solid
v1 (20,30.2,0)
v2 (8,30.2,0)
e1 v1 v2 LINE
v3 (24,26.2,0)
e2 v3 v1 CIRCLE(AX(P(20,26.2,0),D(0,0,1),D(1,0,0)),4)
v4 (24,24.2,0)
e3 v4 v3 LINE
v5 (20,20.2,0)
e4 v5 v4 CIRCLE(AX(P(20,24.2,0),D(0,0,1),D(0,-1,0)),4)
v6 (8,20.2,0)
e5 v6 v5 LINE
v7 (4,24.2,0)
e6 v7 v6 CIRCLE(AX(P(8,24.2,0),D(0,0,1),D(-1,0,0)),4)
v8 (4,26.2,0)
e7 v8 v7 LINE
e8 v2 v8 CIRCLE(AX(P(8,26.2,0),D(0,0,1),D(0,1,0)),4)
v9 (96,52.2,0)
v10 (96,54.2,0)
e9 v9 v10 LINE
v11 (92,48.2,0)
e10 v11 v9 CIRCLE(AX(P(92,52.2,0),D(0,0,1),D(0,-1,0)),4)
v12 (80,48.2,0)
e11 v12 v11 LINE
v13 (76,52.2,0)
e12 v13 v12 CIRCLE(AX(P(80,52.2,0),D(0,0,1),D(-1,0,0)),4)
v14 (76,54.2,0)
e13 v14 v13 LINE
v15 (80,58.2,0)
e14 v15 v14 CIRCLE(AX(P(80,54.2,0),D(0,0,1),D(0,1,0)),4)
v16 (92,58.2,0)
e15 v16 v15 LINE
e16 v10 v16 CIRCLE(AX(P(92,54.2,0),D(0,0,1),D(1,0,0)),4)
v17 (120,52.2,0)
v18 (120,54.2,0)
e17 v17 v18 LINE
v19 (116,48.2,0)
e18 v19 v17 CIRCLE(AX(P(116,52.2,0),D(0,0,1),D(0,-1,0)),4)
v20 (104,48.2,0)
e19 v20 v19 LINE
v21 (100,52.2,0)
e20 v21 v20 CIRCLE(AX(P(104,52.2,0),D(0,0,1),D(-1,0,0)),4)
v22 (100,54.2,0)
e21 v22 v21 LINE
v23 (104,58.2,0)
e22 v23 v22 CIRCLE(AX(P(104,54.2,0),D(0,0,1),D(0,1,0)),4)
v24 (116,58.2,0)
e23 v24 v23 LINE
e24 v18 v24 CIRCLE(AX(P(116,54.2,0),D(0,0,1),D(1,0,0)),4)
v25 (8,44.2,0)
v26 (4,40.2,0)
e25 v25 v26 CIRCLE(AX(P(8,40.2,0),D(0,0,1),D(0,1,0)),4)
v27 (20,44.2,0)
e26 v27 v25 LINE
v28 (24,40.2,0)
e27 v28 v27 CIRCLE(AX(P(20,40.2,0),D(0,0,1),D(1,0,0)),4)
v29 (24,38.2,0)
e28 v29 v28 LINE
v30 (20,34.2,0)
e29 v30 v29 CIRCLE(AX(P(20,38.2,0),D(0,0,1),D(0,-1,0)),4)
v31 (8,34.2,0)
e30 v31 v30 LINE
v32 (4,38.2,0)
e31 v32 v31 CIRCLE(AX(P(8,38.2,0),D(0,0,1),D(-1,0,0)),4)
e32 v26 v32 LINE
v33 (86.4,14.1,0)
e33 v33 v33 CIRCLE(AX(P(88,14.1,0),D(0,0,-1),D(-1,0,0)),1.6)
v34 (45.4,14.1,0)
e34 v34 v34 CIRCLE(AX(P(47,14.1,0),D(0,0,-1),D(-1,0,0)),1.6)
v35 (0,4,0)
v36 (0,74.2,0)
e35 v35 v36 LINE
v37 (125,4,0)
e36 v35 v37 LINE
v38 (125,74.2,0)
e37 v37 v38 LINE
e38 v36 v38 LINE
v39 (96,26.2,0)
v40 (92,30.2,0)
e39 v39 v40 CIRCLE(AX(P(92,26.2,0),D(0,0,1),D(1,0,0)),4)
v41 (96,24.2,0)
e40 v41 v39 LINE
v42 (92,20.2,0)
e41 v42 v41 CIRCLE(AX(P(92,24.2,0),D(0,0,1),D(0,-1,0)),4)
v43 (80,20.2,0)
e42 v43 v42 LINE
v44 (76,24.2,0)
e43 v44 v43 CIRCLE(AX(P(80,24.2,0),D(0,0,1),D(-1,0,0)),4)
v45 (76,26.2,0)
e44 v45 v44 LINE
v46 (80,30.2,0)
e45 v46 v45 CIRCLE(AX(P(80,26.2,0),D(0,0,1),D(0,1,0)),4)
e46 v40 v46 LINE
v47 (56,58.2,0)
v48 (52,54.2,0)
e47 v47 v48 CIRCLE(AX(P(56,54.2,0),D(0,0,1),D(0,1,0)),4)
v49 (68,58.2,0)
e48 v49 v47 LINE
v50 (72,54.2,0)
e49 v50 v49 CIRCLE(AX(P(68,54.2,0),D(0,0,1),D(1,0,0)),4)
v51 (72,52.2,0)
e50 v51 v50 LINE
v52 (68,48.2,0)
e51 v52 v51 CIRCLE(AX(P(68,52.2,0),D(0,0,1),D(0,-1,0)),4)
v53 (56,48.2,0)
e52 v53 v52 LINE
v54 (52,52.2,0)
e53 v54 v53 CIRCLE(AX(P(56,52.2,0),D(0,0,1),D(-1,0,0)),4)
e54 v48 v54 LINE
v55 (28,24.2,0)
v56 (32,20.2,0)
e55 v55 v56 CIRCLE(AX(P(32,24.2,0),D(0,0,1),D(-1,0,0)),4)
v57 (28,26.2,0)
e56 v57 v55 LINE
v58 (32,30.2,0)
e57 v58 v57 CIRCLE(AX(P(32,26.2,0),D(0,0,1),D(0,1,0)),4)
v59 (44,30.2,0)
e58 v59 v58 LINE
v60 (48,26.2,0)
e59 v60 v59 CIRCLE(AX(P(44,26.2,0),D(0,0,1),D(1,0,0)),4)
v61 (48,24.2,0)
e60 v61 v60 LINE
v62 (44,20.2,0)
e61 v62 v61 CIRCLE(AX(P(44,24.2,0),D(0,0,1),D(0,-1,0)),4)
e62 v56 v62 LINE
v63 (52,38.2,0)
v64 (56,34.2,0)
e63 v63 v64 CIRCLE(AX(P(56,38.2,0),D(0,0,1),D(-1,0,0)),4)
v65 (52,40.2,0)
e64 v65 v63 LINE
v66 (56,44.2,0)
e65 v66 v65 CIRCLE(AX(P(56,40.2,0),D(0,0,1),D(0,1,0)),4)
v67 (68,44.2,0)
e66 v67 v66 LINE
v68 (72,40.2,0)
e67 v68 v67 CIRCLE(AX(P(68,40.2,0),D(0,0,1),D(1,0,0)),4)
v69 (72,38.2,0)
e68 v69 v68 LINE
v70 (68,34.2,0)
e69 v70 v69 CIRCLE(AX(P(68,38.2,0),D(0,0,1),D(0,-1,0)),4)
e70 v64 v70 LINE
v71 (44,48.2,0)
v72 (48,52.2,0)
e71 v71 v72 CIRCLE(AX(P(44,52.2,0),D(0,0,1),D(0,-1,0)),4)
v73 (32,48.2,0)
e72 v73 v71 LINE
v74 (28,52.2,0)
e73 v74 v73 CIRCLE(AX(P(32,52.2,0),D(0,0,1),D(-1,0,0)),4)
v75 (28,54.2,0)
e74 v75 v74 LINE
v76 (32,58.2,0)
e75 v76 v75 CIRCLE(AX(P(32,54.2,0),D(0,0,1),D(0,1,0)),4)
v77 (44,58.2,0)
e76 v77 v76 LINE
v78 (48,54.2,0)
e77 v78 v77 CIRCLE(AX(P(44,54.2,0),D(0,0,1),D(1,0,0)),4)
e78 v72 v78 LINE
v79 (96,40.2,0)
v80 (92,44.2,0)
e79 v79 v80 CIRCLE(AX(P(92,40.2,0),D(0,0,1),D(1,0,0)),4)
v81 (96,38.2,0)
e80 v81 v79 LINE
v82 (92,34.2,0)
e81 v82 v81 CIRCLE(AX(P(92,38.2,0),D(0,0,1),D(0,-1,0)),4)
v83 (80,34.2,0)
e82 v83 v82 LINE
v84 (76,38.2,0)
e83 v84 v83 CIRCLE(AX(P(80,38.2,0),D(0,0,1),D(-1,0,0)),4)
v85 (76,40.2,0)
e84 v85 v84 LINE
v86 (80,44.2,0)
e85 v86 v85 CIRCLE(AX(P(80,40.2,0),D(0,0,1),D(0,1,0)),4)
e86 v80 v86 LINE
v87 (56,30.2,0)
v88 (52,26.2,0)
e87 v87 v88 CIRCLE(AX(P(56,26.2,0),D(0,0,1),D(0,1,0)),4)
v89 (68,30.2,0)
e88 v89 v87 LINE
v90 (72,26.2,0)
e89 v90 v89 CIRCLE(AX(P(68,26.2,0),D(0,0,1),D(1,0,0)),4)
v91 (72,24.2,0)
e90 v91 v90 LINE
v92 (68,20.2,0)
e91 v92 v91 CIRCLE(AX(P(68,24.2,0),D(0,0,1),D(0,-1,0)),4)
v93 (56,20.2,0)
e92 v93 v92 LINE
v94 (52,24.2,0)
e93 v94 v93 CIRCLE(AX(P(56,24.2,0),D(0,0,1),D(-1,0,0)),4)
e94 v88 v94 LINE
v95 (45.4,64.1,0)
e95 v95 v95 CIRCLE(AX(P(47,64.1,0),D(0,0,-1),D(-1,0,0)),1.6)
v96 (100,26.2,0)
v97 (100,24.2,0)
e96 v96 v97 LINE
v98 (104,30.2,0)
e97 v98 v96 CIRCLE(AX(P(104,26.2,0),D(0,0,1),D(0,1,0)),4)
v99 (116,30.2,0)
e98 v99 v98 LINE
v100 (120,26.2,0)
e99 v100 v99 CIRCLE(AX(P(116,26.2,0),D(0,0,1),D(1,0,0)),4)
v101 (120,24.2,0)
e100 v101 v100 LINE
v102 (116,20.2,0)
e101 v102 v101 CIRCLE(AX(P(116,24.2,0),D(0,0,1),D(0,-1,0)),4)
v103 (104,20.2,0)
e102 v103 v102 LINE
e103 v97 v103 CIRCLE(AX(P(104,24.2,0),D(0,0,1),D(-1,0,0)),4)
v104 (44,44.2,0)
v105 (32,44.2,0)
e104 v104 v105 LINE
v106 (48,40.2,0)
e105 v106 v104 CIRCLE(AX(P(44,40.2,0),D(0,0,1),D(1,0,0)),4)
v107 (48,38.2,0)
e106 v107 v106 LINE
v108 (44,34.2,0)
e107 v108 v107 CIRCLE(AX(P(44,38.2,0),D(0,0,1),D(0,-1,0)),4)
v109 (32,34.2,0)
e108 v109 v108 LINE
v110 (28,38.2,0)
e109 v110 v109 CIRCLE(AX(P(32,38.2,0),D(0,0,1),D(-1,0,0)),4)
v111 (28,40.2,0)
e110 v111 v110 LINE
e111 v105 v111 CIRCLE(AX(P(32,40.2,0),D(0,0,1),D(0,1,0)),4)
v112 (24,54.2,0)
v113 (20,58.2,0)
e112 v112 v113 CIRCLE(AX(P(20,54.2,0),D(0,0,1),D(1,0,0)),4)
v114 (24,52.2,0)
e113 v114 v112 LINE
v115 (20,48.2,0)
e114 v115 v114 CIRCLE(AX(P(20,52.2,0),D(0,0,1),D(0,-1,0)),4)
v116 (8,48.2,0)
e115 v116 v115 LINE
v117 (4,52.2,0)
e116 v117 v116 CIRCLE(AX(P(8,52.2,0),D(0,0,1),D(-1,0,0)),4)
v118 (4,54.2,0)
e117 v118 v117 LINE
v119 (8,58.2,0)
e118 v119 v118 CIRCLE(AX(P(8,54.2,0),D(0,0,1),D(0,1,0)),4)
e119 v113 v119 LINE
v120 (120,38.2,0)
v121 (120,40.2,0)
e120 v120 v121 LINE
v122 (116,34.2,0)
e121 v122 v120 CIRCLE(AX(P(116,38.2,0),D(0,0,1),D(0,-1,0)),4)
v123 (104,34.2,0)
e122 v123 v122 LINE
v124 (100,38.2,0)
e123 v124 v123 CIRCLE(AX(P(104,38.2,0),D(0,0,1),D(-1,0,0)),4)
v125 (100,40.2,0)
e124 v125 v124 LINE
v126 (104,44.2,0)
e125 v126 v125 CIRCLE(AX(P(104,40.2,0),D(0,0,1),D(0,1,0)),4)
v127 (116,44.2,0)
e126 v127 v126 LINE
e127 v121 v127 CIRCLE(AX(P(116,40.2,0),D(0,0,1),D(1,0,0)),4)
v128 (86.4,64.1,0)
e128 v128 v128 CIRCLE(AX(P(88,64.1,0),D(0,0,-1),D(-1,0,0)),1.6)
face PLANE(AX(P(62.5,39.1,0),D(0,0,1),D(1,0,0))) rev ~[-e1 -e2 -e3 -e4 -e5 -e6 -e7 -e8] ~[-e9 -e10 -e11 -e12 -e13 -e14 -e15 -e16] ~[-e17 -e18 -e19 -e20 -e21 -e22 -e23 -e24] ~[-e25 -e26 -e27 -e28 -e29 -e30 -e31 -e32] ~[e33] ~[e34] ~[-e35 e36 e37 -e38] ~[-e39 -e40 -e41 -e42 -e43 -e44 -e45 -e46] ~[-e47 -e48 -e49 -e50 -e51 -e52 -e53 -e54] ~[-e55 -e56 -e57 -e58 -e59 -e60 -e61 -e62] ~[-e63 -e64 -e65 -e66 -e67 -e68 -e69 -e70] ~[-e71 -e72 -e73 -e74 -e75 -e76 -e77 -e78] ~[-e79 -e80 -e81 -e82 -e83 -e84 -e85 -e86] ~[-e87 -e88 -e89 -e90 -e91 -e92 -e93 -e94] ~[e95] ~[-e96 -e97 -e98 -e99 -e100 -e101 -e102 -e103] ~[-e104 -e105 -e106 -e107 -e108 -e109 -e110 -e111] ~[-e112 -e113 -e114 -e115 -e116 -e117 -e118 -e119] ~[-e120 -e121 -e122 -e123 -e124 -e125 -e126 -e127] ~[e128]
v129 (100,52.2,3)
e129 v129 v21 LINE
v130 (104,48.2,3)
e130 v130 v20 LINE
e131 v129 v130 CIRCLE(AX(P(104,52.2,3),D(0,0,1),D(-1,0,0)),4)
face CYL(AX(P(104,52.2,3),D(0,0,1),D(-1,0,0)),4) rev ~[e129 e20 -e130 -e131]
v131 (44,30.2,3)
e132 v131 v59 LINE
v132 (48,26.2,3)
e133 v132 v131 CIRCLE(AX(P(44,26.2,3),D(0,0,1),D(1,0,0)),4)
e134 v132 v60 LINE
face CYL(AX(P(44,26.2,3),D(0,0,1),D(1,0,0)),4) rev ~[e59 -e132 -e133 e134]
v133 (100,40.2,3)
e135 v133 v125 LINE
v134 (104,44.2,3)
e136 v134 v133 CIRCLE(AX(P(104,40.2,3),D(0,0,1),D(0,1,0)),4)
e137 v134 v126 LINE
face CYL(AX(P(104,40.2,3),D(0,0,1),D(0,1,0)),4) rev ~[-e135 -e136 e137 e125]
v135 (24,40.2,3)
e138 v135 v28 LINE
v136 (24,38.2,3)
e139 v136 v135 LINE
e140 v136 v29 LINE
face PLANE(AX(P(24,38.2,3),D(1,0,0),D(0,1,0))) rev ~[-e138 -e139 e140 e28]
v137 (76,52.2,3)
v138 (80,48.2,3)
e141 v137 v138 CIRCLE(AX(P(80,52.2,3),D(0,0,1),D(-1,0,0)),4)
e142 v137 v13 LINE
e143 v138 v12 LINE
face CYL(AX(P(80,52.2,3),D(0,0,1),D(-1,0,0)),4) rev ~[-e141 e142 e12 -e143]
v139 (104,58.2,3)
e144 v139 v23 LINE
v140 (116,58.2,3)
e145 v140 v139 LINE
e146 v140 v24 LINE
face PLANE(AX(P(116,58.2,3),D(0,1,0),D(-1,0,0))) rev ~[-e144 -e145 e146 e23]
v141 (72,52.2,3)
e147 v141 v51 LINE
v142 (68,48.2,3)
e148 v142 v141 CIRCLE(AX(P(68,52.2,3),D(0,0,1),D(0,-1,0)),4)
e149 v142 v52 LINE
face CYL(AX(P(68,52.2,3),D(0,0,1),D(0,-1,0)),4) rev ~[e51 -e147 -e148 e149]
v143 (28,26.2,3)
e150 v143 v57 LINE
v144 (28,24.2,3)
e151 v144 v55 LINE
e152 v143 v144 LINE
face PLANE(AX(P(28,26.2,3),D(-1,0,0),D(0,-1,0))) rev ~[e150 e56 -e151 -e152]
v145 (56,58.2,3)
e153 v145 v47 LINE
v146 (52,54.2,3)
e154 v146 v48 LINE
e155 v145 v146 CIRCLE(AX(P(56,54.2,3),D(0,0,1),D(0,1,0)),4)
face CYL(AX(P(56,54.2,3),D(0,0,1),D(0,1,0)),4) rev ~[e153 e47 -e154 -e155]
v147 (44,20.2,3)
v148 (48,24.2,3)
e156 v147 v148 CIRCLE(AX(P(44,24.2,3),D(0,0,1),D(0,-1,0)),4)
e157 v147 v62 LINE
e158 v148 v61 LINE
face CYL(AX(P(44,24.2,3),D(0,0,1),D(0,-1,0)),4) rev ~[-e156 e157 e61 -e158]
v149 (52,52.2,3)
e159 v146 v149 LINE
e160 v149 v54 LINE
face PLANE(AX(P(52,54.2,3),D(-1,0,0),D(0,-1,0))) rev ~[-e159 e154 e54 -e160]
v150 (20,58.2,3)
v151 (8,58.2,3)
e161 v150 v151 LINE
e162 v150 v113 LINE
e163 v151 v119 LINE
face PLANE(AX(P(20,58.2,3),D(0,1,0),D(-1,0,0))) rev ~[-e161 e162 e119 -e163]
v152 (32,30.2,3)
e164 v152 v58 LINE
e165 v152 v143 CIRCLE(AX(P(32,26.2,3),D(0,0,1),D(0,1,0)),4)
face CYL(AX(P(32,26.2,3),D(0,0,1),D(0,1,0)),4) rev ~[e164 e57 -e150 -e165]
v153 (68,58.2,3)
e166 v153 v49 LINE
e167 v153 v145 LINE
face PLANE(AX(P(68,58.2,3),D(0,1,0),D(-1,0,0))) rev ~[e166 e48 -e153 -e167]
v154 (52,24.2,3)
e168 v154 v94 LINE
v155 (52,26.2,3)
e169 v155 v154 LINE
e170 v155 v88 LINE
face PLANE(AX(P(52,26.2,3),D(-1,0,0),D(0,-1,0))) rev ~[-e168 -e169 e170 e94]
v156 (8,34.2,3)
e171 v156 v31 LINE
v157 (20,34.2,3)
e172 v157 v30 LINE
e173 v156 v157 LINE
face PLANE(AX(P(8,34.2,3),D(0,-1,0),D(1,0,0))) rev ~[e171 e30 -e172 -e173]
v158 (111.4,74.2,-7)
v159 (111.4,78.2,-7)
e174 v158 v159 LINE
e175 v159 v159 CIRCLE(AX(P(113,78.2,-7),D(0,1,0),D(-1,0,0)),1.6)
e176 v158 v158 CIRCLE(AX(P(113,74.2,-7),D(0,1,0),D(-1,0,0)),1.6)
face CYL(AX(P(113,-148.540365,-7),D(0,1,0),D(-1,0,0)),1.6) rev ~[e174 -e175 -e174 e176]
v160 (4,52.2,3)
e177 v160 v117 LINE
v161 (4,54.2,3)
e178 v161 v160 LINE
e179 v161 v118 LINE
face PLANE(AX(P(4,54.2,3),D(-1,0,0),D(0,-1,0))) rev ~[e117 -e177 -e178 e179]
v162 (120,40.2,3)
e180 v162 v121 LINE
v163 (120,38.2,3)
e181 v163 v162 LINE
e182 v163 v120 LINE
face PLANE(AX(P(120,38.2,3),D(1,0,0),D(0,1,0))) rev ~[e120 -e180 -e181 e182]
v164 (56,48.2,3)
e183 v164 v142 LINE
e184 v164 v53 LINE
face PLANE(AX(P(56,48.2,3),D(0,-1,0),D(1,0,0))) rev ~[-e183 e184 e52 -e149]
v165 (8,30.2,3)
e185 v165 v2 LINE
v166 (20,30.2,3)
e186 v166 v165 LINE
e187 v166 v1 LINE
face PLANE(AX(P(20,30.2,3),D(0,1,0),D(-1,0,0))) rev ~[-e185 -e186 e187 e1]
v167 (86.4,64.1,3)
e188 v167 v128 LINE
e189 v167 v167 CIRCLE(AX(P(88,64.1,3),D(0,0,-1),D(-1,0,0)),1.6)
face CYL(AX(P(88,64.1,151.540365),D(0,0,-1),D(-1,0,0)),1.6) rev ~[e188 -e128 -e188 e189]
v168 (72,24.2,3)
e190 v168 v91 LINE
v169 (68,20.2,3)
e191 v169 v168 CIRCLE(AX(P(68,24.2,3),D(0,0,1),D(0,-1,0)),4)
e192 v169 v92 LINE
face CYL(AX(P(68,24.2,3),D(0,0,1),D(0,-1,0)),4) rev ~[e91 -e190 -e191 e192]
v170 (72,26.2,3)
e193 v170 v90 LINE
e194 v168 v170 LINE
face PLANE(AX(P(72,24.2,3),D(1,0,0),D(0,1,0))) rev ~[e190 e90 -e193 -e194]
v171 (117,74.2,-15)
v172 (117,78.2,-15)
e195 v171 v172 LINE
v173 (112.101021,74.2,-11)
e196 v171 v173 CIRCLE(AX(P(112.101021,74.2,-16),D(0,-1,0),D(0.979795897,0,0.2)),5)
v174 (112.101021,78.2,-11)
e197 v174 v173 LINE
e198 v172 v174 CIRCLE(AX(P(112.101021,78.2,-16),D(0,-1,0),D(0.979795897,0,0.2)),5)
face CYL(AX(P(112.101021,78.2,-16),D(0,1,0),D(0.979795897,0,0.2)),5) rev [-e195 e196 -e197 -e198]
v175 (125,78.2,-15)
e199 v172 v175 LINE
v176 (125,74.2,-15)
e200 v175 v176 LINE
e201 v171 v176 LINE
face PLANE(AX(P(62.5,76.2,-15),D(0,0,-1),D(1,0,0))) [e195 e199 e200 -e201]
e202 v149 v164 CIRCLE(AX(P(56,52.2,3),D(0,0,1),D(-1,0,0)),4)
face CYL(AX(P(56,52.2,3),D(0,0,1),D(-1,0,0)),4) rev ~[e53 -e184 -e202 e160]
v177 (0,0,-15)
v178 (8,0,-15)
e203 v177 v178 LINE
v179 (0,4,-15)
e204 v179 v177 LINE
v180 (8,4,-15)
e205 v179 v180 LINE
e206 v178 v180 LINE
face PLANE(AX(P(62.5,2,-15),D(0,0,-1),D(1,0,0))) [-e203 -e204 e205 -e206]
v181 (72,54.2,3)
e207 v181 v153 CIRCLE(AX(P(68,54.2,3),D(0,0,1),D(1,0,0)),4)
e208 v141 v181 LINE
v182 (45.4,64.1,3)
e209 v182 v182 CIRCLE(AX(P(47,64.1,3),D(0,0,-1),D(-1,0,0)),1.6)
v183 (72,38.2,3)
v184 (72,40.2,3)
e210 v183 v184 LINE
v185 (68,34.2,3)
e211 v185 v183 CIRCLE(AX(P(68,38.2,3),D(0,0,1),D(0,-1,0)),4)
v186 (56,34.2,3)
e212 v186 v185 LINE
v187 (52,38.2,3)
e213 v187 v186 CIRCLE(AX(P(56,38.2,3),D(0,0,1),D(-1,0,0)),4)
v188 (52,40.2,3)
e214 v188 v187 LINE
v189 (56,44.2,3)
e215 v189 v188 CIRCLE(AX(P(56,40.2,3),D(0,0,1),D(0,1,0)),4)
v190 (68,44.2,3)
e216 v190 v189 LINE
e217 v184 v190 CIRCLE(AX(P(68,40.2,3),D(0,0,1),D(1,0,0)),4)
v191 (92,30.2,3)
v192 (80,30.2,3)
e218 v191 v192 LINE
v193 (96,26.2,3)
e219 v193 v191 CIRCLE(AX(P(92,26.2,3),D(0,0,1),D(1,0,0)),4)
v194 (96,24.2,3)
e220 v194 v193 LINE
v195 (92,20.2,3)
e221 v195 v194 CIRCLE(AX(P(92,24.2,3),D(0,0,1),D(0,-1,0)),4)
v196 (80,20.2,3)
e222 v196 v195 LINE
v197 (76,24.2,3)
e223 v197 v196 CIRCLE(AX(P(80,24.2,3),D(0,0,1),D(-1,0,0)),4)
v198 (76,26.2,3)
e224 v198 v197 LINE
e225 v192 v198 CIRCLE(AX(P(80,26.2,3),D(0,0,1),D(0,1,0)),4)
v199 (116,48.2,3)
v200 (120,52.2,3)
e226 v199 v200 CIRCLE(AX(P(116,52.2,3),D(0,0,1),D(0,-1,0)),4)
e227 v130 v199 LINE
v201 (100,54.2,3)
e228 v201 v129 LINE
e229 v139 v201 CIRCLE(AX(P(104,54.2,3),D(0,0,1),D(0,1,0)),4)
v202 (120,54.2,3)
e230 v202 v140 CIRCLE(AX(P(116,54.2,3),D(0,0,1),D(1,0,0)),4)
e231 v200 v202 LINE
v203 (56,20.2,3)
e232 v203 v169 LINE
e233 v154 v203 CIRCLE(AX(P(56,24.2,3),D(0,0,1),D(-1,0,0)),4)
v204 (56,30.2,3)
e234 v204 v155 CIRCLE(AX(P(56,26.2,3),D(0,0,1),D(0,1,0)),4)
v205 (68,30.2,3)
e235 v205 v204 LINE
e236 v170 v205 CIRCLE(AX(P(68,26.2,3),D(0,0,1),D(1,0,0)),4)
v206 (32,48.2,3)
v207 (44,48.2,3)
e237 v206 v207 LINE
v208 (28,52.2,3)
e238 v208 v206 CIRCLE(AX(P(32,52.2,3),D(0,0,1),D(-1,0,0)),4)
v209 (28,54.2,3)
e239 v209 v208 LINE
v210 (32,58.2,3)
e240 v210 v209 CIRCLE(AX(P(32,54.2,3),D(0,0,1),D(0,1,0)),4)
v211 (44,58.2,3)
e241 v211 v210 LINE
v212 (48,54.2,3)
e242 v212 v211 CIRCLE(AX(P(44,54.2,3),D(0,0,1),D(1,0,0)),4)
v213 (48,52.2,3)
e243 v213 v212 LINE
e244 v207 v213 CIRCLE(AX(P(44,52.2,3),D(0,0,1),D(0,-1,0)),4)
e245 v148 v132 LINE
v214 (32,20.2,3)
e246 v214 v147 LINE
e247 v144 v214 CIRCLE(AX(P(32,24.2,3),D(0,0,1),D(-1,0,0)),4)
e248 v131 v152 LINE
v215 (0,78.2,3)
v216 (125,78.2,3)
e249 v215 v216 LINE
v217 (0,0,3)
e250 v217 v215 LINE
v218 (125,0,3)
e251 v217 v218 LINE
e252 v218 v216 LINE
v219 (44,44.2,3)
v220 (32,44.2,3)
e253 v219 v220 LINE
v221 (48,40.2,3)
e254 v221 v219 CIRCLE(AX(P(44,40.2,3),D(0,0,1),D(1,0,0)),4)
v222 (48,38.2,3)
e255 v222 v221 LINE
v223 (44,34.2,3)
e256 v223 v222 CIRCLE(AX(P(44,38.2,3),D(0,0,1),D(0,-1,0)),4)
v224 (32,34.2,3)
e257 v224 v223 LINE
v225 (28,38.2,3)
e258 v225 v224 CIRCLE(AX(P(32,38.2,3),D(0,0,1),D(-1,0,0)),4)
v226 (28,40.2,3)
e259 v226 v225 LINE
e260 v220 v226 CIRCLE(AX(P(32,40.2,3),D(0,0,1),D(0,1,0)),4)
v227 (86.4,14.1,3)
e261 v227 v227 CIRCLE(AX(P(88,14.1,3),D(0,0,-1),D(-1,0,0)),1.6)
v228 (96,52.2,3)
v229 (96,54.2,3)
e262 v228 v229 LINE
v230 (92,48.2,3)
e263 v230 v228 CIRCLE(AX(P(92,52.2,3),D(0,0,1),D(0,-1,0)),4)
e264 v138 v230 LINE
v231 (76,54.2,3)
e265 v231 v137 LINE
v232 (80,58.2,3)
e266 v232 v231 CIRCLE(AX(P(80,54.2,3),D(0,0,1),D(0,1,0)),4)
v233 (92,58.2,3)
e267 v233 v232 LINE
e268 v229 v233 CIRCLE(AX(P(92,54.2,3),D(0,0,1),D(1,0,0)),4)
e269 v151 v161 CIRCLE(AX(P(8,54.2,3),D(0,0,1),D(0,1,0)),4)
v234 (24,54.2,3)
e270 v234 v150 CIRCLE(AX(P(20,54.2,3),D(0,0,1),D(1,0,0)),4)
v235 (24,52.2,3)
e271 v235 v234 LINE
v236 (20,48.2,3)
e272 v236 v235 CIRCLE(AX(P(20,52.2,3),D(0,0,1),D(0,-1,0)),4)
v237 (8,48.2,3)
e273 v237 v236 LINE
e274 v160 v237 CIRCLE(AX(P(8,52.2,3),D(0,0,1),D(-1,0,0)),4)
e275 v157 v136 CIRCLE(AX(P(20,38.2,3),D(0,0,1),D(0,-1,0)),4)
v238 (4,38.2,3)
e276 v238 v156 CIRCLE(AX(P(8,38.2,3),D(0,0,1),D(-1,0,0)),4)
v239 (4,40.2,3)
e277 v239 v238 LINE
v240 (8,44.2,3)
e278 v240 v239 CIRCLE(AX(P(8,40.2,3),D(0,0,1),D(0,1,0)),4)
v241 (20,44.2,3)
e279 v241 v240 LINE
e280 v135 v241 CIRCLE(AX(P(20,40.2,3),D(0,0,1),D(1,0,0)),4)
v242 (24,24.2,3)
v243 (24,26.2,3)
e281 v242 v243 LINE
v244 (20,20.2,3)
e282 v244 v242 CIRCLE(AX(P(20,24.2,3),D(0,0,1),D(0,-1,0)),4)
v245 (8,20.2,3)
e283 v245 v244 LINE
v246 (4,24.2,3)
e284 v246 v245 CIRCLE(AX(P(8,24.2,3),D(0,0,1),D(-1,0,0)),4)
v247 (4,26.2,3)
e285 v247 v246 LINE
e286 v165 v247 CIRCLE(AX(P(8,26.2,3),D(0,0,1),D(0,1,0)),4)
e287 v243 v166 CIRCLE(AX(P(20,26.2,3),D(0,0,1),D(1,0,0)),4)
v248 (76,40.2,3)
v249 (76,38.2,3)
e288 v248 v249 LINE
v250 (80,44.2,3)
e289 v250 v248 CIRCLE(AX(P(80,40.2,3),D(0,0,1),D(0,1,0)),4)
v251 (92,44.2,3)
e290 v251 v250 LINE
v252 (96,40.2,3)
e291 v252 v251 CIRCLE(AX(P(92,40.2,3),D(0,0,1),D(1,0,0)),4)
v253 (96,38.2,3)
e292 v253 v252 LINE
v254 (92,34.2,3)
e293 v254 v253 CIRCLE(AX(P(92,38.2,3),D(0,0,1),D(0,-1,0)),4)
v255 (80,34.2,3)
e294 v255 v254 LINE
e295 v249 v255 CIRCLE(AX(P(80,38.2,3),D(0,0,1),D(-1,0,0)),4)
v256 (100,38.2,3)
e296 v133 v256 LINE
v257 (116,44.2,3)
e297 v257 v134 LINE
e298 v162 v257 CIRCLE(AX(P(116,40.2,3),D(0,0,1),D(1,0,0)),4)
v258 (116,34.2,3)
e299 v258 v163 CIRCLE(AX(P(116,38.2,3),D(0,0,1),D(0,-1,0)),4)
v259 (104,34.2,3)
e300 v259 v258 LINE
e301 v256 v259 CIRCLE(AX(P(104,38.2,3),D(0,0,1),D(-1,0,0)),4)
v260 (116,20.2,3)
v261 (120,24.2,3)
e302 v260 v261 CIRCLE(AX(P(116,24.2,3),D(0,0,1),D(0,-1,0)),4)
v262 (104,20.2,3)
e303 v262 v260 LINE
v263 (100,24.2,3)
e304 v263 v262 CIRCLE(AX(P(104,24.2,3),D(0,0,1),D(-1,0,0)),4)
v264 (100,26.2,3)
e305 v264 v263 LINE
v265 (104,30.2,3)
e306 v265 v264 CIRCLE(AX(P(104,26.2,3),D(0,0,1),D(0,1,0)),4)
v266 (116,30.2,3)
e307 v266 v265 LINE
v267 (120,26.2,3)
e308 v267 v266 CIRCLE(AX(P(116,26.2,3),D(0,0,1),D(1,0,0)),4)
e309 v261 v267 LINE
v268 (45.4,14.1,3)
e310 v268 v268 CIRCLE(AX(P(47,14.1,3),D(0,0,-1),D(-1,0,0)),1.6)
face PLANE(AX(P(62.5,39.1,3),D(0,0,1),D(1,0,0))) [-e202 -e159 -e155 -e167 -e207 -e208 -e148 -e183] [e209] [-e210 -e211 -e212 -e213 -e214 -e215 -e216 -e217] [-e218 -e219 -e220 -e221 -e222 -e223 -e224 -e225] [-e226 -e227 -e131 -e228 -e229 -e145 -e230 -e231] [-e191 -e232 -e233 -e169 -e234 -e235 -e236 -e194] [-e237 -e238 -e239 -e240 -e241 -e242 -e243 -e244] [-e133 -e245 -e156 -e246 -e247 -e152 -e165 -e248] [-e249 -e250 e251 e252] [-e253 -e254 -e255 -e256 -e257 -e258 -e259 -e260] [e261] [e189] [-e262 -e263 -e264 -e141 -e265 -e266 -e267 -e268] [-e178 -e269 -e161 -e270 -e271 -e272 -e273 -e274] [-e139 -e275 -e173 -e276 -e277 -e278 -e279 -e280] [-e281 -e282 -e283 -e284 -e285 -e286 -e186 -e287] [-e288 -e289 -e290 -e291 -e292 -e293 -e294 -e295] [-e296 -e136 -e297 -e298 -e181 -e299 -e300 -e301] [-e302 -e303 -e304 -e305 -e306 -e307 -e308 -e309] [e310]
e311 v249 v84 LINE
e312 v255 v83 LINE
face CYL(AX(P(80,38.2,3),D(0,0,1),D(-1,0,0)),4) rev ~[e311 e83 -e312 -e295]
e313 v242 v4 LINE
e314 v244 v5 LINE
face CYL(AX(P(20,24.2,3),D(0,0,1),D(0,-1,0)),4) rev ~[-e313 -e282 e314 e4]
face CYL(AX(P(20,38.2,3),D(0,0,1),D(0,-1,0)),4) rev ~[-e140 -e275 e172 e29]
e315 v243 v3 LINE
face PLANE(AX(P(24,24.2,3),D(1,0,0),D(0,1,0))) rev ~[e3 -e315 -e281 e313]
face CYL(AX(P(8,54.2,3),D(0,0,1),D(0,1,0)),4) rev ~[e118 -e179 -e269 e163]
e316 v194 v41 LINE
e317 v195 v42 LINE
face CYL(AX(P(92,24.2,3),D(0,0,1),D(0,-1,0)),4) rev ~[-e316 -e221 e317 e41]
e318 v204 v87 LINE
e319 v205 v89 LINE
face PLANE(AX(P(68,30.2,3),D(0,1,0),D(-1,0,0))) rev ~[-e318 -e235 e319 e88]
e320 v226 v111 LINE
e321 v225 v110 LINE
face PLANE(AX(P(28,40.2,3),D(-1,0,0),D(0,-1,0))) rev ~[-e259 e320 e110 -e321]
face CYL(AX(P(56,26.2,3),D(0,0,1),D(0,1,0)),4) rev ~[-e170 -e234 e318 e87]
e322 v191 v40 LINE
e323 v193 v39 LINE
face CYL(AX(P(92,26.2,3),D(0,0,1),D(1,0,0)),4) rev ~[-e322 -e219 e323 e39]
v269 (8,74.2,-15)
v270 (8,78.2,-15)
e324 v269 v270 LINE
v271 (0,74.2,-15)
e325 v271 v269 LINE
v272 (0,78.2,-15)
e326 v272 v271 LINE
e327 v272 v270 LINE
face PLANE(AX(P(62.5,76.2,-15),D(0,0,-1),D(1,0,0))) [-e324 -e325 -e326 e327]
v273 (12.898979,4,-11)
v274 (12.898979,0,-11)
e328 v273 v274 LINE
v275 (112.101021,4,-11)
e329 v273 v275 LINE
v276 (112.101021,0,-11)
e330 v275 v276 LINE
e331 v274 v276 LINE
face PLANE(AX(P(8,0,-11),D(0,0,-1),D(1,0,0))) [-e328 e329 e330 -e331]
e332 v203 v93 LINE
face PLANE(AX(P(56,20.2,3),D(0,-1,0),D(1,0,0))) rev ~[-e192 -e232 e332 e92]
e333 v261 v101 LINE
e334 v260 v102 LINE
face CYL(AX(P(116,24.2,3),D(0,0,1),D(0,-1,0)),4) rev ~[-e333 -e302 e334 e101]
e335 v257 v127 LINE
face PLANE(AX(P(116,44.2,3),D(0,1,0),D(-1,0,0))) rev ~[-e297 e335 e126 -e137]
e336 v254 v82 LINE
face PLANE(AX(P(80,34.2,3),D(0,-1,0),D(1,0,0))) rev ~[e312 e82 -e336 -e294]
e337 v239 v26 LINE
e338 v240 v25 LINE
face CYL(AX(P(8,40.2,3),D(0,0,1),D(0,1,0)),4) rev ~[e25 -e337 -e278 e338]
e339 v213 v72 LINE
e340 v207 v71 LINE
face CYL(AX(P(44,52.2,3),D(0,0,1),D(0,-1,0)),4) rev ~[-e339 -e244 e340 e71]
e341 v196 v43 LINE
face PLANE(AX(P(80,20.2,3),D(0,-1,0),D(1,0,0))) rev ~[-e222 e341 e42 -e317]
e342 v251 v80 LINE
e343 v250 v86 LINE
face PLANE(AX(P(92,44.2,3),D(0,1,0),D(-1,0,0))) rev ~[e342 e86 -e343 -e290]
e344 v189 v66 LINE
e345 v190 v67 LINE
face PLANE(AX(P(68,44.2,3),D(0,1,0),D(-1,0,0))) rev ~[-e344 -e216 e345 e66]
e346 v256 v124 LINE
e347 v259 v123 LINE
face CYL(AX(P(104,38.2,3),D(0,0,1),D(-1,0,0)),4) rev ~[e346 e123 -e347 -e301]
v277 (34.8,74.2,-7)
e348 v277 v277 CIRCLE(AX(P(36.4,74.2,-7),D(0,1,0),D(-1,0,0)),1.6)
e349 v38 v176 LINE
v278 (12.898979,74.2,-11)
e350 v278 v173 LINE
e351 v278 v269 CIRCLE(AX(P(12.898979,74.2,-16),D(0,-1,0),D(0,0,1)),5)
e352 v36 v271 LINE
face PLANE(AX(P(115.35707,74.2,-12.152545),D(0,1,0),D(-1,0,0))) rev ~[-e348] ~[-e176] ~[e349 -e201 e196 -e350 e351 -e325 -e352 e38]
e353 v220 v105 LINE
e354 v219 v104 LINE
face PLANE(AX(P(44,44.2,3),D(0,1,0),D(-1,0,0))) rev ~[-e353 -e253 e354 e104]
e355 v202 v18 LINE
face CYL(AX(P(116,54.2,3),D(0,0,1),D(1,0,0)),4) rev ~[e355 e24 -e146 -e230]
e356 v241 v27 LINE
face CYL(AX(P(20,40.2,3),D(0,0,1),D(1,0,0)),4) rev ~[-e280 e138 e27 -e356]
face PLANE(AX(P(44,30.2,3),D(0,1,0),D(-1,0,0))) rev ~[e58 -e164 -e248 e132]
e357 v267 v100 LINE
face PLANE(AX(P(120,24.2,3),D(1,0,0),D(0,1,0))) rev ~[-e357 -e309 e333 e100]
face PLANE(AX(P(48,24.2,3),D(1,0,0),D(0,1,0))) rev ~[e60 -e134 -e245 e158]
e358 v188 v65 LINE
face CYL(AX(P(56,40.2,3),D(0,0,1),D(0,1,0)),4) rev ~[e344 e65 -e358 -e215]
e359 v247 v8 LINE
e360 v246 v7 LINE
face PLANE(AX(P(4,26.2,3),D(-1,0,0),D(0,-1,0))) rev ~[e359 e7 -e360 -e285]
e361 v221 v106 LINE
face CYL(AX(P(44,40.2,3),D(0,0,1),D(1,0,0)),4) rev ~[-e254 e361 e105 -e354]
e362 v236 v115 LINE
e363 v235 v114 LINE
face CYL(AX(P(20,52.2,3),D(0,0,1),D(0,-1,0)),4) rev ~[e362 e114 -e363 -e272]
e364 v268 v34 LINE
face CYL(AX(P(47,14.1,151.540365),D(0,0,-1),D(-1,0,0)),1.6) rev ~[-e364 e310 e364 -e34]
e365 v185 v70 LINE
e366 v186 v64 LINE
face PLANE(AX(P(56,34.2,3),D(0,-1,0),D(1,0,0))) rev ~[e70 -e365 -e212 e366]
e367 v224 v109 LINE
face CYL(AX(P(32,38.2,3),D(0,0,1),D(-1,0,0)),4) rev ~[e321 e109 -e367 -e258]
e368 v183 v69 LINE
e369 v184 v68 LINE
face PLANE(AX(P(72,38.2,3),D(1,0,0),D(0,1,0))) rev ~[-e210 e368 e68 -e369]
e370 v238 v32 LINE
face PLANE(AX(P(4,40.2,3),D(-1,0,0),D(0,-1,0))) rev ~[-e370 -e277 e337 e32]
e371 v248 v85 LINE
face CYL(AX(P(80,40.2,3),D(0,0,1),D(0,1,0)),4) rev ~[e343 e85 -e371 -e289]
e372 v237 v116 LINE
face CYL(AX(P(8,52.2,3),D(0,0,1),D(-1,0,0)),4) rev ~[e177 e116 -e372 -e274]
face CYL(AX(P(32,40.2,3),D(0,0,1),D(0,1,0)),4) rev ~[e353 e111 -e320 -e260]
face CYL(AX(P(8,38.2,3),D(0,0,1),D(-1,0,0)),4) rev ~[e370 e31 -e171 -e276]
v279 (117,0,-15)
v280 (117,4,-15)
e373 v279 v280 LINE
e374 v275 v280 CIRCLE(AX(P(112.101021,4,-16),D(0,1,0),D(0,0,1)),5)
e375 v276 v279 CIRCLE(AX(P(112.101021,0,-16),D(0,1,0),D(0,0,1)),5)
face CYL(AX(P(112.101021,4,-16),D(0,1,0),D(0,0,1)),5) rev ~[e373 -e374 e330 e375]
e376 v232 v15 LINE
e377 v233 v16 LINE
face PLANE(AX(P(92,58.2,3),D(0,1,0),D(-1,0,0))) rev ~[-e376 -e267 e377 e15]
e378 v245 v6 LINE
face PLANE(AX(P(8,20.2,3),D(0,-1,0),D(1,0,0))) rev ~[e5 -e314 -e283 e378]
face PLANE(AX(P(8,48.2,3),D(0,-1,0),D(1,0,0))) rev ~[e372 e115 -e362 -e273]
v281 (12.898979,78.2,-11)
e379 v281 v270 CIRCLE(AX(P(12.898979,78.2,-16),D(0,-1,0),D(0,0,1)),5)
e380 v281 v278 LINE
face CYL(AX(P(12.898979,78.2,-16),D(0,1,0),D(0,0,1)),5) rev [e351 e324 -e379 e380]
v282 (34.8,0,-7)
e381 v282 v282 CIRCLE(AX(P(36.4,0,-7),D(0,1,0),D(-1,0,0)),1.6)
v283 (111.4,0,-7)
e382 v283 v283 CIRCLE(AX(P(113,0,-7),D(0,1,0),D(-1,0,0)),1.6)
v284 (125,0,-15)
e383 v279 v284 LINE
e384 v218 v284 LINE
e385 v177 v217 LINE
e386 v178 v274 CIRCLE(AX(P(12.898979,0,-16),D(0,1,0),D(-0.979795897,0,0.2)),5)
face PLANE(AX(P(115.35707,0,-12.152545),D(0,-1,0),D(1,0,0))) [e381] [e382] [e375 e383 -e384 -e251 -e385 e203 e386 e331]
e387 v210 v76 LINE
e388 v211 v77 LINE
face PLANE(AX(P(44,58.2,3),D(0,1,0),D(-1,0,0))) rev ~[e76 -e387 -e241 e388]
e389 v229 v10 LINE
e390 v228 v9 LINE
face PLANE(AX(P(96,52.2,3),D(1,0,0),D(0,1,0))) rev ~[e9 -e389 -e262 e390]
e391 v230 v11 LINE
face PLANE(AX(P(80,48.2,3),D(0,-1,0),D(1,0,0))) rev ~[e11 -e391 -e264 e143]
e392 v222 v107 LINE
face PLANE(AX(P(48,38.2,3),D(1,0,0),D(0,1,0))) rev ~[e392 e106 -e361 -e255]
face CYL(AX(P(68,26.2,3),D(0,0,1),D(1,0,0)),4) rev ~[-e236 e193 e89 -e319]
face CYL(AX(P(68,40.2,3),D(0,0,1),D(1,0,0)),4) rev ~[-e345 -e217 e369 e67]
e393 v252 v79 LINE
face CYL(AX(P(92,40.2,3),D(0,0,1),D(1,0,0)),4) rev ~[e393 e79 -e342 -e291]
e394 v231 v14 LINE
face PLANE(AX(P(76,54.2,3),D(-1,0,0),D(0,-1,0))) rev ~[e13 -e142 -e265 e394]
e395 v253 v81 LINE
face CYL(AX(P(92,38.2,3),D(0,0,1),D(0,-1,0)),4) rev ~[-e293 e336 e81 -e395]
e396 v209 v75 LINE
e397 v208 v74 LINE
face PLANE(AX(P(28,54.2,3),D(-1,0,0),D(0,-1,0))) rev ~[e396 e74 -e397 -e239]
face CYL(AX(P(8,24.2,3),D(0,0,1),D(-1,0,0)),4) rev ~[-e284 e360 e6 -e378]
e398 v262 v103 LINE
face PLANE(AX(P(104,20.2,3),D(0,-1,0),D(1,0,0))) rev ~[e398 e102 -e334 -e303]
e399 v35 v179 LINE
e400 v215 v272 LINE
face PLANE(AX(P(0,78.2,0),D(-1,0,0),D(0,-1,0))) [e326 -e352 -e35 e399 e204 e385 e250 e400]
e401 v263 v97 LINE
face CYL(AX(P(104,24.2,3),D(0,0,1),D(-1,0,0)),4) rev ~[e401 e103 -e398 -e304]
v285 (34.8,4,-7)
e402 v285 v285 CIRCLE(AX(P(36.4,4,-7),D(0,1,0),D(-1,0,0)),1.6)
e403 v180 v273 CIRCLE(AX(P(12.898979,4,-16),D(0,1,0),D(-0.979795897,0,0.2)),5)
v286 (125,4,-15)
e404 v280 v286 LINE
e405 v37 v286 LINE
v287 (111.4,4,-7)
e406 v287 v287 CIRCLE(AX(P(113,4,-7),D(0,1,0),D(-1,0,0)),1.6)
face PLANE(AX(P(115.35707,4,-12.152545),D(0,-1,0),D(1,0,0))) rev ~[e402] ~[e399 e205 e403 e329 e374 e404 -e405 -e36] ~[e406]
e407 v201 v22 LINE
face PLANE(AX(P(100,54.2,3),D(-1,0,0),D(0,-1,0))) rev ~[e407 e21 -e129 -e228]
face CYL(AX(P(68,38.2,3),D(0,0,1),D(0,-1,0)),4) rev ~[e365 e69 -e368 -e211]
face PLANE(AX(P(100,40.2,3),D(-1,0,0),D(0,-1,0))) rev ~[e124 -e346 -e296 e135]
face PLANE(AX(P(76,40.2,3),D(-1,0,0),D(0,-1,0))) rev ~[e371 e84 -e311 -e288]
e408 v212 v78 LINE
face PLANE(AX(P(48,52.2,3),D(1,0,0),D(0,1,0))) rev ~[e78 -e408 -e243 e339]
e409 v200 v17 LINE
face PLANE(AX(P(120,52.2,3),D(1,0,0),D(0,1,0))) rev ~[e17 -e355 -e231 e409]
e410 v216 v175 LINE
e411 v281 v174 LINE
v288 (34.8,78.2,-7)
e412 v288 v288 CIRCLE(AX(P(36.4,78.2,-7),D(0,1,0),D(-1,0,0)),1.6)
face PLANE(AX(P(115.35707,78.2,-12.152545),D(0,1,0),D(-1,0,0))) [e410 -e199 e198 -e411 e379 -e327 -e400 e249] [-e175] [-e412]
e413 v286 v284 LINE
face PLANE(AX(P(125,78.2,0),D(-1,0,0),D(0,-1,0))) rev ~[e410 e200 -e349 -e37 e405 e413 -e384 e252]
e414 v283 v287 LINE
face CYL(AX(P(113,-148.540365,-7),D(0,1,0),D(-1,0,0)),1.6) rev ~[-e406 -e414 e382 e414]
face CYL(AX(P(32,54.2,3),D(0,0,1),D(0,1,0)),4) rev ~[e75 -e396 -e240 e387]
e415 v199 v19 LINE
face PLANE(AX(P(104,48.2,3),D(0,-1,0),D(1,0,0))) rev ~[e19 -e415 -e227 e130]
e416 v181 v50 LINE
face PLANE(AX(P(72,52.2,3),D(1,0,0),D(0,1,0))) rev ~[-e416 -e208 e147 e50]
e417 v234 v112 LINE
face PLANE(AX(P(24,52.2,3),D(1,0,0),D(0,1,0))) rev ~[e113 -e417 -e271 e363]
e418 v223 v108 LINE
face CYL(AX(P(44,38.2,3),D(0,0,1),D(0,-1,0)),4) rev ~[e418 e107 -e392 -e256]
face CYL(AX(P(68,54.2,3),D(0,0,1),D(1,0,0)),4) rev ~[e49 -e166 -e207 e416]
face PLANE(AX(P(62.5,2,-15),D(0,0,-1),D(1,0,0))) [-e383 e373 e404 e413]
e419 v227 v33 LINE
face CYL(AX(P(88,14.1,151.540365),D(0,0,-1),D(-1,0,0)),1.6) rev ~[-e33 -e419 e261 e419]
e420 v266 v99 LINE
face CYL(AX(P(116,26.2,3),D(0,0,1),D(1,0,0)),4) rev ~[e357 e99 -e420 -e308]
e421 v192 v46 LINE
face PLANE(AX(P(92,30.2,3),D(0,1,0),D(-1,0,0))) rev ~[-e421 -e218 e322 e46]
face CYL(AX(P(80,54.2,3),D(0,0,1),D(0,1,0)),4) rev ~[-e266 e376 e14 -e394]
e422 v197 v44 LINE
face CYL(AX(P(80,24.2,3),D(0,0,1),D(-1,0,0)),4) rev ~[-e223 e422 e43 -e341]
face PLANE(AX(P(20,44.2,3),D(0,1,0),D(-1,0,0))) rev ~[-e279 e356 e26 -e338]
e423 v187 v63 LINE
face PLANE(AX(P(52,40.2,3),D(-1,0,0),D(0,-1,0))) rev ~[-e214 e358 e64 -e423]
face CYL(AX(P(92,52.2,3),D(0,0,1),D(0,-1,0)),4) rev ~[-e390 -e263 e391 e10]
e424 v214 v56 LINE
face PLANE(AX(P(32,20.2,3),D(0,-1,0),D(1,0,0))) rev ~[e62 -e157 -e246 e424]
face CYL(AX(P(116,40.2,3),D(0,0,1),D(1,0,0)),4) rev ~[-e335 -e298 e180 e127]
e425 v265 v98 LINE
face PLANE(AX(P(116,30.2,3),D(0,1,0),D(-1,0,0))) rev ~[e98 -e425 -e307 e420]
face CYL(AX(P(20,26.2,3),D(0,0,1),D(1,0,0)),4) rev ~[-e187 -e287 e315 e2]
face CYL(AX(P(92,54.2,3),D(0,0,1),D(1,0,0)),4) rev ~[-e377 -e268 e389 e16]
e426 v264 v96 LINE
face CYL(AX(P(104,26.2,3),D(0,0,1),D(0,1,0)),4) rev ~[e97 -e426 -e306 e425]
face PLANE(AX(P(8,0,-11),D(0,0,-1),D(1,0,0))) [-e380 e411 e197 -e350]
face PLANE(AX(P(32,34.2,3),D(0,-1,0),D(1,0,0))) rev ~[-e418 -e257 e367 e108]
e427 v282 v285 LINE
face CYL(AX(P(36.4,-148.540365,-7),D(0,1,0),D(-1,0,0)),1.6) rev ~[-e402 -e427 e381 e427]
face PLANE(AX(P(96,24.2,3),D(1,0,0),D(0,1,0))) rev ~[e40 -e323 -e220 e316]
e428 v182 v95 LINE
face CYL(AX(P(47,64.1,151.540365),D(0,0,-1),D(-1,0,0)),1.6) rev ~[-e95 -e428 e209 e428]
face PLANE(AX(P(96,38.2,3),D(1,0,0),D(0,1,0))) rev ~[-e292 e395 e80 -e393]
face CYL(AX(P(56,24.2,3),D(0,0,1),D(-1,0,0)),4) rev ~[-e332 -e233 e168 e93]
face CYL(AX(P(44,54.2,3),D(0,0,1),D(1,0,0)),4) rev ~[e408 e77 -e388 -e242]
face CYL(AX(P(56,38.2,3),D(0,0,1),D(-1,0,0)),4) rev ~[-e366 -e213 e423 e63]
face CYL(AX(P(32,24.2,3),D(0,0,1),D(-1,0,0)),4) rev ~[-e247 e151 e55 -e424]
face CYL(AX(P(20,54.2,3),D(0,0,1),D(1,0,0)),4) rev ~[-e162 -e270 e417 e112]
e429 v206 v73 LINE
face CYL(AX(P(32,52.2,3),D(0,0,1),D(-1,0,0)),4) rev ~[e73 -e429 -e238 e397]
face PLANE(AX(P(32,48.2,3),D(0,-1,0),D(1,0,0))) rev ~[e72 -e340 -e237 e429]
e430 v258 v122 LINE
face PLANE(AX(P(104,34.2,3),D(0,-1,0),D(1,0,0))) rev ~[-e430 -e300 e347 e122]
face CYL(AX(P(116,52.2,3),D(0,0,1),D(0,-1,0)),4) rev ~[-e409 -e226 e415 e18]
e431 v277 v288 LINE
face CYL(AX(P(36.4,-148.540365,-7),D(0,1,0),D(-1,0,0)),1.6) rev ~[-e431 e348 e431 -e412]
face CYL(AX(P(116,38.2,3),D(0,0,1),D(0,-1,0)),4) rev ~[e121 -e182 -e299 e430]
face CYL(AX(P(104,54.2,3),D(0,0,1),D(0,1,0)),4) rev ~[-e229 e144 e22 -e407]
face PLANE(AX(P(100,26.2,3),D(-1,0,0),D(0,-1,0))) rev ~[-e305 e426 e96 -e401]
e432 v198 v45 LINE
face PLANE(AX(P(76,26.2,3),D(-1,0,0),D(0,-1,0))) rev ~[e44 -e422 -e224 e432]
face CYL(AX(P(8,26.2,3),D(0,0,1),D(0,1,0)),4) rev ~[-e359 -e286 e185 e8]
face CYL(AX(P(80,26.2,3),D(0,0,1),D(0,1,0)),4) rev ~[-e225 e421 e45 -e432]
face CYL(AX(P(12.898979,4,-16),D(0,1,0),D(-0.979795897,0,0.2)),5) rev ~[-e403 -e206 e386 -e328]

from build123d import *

# Parameters (mm, degrees)
F0_W         = 125
F0_H         = 78.2
F1_DEPTH     = 3
F2_W         = 125
F2_H         = 4
F3_DEPTH     = 15
F5_D         = 3.2
F6_W         = 109
F6_H         = 4
F7_DEPTH     = 78.201
F9_D         = 3.2
F10_T1_DEPTH = 4
F10_T3_DEPTH = 4
F12_DEPTH    = 3


# Not quite as in the source:
# - a fillet or chamfer that OpenCascade refuses, or shapes differently, is made with other operations: its cross-section is extruded or revolved along the edge and cut away or added


with BuildPart() as f1:
    # F0 (on Top) → F1 (new body)
    with BuildSketch(Plane.XY):
        with Locations((62.5, 39.1)):
            Rectangle(F0_W, F0_H)
    extrude(amount=F1_DEPTH)

    # F2 (on face) → F3 (join)
    with BuildSketch(Plane(origin=(0, 0, 0), x_dir=(1, 0, 0), z_dir=(0, 0, -1))):
        with Locations((62.5, -76.2)):
            Rectangle(F2_W, F2_H)
        with Locations((62.5, -2)):
            Rectangle(F2_W, F2_H)
    extrude(amount=F3_DEPTH)

    # F5 (through all)
    with Locations(Plane.XZ):
        with Locations((113, -7), (36.4, -7)):
            Hole(F5_D / 2)

    # F6 (on face) → F7 (cut, through all)
    with BuildSketch(Plane.XZ):
        with Locations((62.5, -13)):
            Rectangle(F6_W, F6_H)
    extrude(amount=-F7_DEPTH, mode=Mode.SUBTRACT)

    # F9 (through all)
    with Locations(Plane.XY.offset(3)):
        with Locations((47, 14.1), (88, 14.1), (88, 64.1), (47, 64.1)):
            Hole(F9_D / 2)

    # F10: fillet of radius 5 on 4 edges, made by hand

    # F10_s2 → F10_t1 (join)
    with BuildSketch(Plane.XZ.offset(-4)):
        with BuildLine():
            ThreePointArc((112.1010205144, -11), (115.2632981746, -12.1270166538), (117, -15))
            Line((117, -15), (117, -11))
            Line((117, -11), (112.1010205144, -11))
        make_face()
        with BuildLine():
            ThreePointArc((8, -15), (9.7367018254, -12.1270166538), (12.8989794856, -11))
            Line((12.8989794856, -11), (8, -11))
            Line((8, -11), (8, -15))
        make_face()
    extrude(amount=F10_T1_DEPTH)

    # F10_s4 → F10_t3 (join)
    with BuildSketch(Plane.XZ.offset(-78.2)):
        with BuildLine():
            ThreePointArc((117, -15), (115.2632981746, -12.1270166538), (112.1010205144, -11))
            Line((112.1010205144, -11), (117, -11))
            Line((117, -11), (117, -15))
        make_face()
        with BuildLine():
            ThreePointArc((12.8989794856, -11), (9.7367018254, -12.1270166538), (8, -15))
            Line((8, -15), (8, -11))
            Line((8, -11), (12.8989794856, -11))
        make_face()
    extrude(amount=F10_T3_DEPTH)

    # F11 (on face) → F12 (cut, through all)
    with BuildSketch(Plane.XY.offset(3)):
        with BuildLine():
            Line((20, 58.2), (8, 58.2))
            ThreePointArc((8, 58.2), (5.1715728753, 57.0284271247), (4, 54.2))
            Line((4, 54.2), (4, 52.2))
            ThreePointArc((4, 52.2), (5.1715728753, 49.3715728753), (8, 48.2))
            Line((8, 48.2), (20, 48.2))
            ThreePointArc((20, 48.2), (22.8284271247, 49.3715728753), (24, 52.2))
            Line((24, 52.2), (24, 54.2))
            ThreePointArc((24, 54.2), (22.8284271247, 57.0284271247), (20, 58.2))
        make_face()
        with BuildLine():
            Line((20, 44.2), (8, 44.2))
            ThreePointArc((8, 44.2), (5.1715728753, 43.0284271247), (4, 40.2))
            Line((4, 40.2), (4, 38.2))
            ThreePointArc((4, 38.2), (5.1715728753, 35.3715728753), (8, 34.2))
            Line((8, 34.2), (20, 34.2))
            ThreePointArc((20, 34.2), (22.8284271247, 35.3715728753), (24, 38.2))
            Line((24, 38.2), (24, 40.2))
            ThreePointArc((24, 40.2), (22.8284271247, 43.0284271247), (20, 44.2))
        make_face()
        with BuildLine():
            Line((20, 30.2), (8, 30.2))
            ThreePointArc((8, 30.2), (5.1715728753, 29.0284271247), (4, 26.2))
            Line((4, 26.2), (4, 24.2))
            ThreePointArc((4, 24.2), (5.1715728753, 21.3715728753), (8, 20.2))
            Line((8, 20.2), (20, 20.2))
            ThreePointArc((20, 20.2), (22.8284271247, 21.3715728753), (24, 24.2))
            Line((24, 24.2), (24, 26.2))
            ThreePointArc((24, 26.2), (22.8284271247, 29.0284271247), (20, 30.2))
        make_face()
        with BuildLine():
            Line((44, 58.2), (32, 58.2))
            ThreePointArc((32, 58.2), (29.1715728753, 57.0284271247), (28, 54.2))
            Line((28, 54.2), (28, 52.2))
            ThreePointArc((28, 52.2), (29.1715728753, 49.3715728753), (32, 48.2))
            Line((32, 48.2), (44, 48.2))
            ThreePointArc((44, 48.2), (46.8284271247, 49.3715728753), (48, 52.2))
            Line((48, 52.2), (48, 54.2))
            ThreePointArc((48, 54.2), (46.8284271247, 57.0284271247), (44, 58.2))
        make_face()
        with BuildLine():
            Line((44, 44.2), (32, 44.2))
            ThreePointArc((32, 44.2), (29.1715728753, 43.0284271247), (28, 40.2))
            Line((28, 40.2), (28, 38.2))
            ThreePointArc((28, 38.2), (29.1715728753, 35.3715728753), (32, 34.2))
            Line((32, 34.2), (44, 34.2))
            ThreePointArc((44, 34.2), (46.8284271247, 35.3715728753), (48, 38.2))
            Line((48, 38.2), (48, 40.2))
            ThreePointArc((48, 40.2), (46.8284271247, 43.0284271247), (44, 44.2))
        make_face()
        with BuildLine():
            Line((44, 30.2), (32, 30.2))
            ThreePointArc((32, 30.2), (29.1715728753, 29.0284271247), (28, 26.2))
            Line((28, 26.2), (28, 24.2))
            ThreePointArc((28, 24.2), (29.1715728753, 21.3715728753), (32, 20.2))
            Line((32, 20.2), (44, 20.2))
            ThreePointArc((44, 20.2), (46.8284271247, 21.3715728753), (48, 24.2))
            Line((48, 24.2), (48, 26.2))
            ThreePointArc((48, 26.2), (46.8284271247, 29.0284271247), (44, 30.2))
        make_face()
        with BuildLine():
            Line((68, 58.2), (56, 58.2))
            ThreePointArc((56, 58.2), (53.1715728753, 57.0284271247), (52, 54.2))
            Line((52, 54.2), (52, 52.2))
            ThreePointArc((52, 52.2), (53.1715728753, 49.3715728753), (56, 48.2))
            Line((56, 48.2), (68, 48.2))
            ThreePointArc((68, 48.2), (70.8284271247, 49.3715728753), (72, 52.2))
            Line((72, 52.2), (72, 54.2))
            ThreePointArc((72, 54.2), (70.8284271247, 57.0284271247), (68, 58.2))
        make_face()
        with BuildLine():
            Line((68, 44.2), (56, 44.2))
            ThreePointArc((56, 44.2), (53.1715728753, 43.0284271247), (52, 40.2))
            Line((52, 40.2), (52, 38.2))
            ThreePointArc((52, 38.2), (53.1715728753, 35.3715728753), (56, 34.2))
            Line((56, 34.2), (68, 34.2))
            ThreePointArc((68, 34.2), (70.8284271247, 35.3715728753), (72, 38.2))
            Line((72, 38.2), (72, 40.2))
            ThreePointArc((72, 40.2), (70.8284271247, 43.0284271247), (68, 44.2))
        make_face()
        with BuildLine():
            Line((68, 30.2), (56, 30.2))
            ThreePointArc((56, 30.2), (53.1715728753, 29.0284271247), (52, 26.2))
            Line((52, 26.2), (52, 24.2))
            ThreePointArc((52, 24.2), (53.1715728753, 21.3715728753), (56, 20.2))
            Line((56, 20.2), (68, 20.2))
            ThreePointArc((68, 20.2), (70.8284271247, 21.3715728753), (72, 24.2))
            Line((72, 24.2), (72, 26.2))
            ThreePointArc((72, 26.2), (70.8284271247, 29.0284271247), (68, 30.2))
        make_face()
        with BuildLine():
            Line((92, 58.2), (80, 58.2))
            ThreePointArc((80, 58.2), (77.1715728753, 57.0284271247), (76, 54.2))
            Line((76, 54.2), (76, 52.2))
            ThreePointArc((76, 52.2), (77.1715728753, 49.3715728753), (80, 48.2))
            Line((80, 48.2), (92, 48.2))
            ThreePointArc((92, 48.2), (94.8284271247, 49.3715728753), (96, 52.2))
            Line((96, 52.2), (96, 54.2))
            ThreePointArc((96, 54.2), (94.8284271247, 57.0284271247), (92, 58.2))
        make_face()
        with BuildLine():
            Line((92, 44.2), (80, 44.2))
            ThreePointArc((80, 44.2), (77.1715728753, 43.0284271247), (76, 40.2))
            Line((76, 40.2), (76, 38.2))
            ThreePointArc((76, 38.2), (77.1715728753, 35.3715728753), (80, 34.2))
            Line((80, 34.2), (92, 34.2))
            ThreePointArc((92, 34.2), (94.8284271247, 35.3715728753), (96, 38.2))
            Line((96, 38.2), (96, 40.2))
            ThreePointArc((96, 40.2), (94.8284271247, 43.0284271247), (92, 44.2))
        make_face()
        with BuildLine():
            Line((92, 30.2), (80, 30.2))
            ThreePointArc((80, 30.2), (77.1715728753, 29.0284271247), (76, 26.2))
            Line((76, 26.2), (76, 24.2))
            ThreePointArc((76, 24.2), (77.1715728753, 21.3715728753), (80, 20.2))
            Line((80, 20.2), (92, 20.2))
            ThreePointArc((92, 20.2), (94.8284271247, 21.3715728753), (96, 24.2))
            Line((96, 24.2), (96, 26.2))
            ThreePointArc((96, 26.2), (94.8284271247, 29.0284271247), (92, 30.2))
        make_face()
        with BuildLine():
            Line((116, 58.2), (104, 58.2))
            ThreePointArc((104, 58.2), (101.1715728753, 57.0284271247), (100, 54.2))
            Line((100, 54.2), (100, 52.2))
            ThreePointArc((100, 52.2), (101.1715728753, 49.3715728753), (104, 48.2))
            Line((104, 48.2), (116, 48.2))
            ThreePointArc((116, 48.2), (118.8284271247, 49.3715728753), (120, 52.2))
            Line((120, 52.2), (120, 54.2))
            ThreePointArc((120, 54.2), (118.8284271247, 57.0284271247), (116, 58.2))
        make_face()
        with BuildLine():
            Line((116, 44.2), (104, 44.2))
            ThreePointArc((104, 44.2), (101.1715728753, 43.0284271247), (100, 40.2))
            Line((100, 40.2), (100, 38.2))
            ThreePointArc((100, 38.2), (101.1715728753, 35.3715728753), (104, 34.2))
            Line((104, 34.2), (116, 34.2))
            ThreePointArc((116, 34.2), (118.8284271247, 35.3715728753), (120, 38.2))
            Line((120, 38.2), (120, 40.2))
            ThreePointArc((120, 40.2), (118.8284271247, 43.0284271247), (116, 44.2))
        make_face()
        with BuildLine():
            Line((116, 30.2), (104, 30.2))
            ThreePointArc((104, 30.2), (101.1715728753, 29.0284271247), (100, 26.2))
            Line((100, 26.2), (100, 24.2))
            ThreePointArc((100, 24.2), (101.1715728753, 21.3715728753), (104, 20.2))
            Line((104, 20.2), (116, 20.2))
            ThreePointArc((116, 20.2), (118.8284271247, 21.3715728753), (120, 24.2))
            Line((120, 24.2), (120, 26.2))
            ThreePointArc((120, 26.2), (118.8284271247, 29.0284271247), (116, 30.2))
        make_face()
    extrude(amount=-F12_DEPTH, mode=Mode.SUBTRACT)


solid = f1.part
